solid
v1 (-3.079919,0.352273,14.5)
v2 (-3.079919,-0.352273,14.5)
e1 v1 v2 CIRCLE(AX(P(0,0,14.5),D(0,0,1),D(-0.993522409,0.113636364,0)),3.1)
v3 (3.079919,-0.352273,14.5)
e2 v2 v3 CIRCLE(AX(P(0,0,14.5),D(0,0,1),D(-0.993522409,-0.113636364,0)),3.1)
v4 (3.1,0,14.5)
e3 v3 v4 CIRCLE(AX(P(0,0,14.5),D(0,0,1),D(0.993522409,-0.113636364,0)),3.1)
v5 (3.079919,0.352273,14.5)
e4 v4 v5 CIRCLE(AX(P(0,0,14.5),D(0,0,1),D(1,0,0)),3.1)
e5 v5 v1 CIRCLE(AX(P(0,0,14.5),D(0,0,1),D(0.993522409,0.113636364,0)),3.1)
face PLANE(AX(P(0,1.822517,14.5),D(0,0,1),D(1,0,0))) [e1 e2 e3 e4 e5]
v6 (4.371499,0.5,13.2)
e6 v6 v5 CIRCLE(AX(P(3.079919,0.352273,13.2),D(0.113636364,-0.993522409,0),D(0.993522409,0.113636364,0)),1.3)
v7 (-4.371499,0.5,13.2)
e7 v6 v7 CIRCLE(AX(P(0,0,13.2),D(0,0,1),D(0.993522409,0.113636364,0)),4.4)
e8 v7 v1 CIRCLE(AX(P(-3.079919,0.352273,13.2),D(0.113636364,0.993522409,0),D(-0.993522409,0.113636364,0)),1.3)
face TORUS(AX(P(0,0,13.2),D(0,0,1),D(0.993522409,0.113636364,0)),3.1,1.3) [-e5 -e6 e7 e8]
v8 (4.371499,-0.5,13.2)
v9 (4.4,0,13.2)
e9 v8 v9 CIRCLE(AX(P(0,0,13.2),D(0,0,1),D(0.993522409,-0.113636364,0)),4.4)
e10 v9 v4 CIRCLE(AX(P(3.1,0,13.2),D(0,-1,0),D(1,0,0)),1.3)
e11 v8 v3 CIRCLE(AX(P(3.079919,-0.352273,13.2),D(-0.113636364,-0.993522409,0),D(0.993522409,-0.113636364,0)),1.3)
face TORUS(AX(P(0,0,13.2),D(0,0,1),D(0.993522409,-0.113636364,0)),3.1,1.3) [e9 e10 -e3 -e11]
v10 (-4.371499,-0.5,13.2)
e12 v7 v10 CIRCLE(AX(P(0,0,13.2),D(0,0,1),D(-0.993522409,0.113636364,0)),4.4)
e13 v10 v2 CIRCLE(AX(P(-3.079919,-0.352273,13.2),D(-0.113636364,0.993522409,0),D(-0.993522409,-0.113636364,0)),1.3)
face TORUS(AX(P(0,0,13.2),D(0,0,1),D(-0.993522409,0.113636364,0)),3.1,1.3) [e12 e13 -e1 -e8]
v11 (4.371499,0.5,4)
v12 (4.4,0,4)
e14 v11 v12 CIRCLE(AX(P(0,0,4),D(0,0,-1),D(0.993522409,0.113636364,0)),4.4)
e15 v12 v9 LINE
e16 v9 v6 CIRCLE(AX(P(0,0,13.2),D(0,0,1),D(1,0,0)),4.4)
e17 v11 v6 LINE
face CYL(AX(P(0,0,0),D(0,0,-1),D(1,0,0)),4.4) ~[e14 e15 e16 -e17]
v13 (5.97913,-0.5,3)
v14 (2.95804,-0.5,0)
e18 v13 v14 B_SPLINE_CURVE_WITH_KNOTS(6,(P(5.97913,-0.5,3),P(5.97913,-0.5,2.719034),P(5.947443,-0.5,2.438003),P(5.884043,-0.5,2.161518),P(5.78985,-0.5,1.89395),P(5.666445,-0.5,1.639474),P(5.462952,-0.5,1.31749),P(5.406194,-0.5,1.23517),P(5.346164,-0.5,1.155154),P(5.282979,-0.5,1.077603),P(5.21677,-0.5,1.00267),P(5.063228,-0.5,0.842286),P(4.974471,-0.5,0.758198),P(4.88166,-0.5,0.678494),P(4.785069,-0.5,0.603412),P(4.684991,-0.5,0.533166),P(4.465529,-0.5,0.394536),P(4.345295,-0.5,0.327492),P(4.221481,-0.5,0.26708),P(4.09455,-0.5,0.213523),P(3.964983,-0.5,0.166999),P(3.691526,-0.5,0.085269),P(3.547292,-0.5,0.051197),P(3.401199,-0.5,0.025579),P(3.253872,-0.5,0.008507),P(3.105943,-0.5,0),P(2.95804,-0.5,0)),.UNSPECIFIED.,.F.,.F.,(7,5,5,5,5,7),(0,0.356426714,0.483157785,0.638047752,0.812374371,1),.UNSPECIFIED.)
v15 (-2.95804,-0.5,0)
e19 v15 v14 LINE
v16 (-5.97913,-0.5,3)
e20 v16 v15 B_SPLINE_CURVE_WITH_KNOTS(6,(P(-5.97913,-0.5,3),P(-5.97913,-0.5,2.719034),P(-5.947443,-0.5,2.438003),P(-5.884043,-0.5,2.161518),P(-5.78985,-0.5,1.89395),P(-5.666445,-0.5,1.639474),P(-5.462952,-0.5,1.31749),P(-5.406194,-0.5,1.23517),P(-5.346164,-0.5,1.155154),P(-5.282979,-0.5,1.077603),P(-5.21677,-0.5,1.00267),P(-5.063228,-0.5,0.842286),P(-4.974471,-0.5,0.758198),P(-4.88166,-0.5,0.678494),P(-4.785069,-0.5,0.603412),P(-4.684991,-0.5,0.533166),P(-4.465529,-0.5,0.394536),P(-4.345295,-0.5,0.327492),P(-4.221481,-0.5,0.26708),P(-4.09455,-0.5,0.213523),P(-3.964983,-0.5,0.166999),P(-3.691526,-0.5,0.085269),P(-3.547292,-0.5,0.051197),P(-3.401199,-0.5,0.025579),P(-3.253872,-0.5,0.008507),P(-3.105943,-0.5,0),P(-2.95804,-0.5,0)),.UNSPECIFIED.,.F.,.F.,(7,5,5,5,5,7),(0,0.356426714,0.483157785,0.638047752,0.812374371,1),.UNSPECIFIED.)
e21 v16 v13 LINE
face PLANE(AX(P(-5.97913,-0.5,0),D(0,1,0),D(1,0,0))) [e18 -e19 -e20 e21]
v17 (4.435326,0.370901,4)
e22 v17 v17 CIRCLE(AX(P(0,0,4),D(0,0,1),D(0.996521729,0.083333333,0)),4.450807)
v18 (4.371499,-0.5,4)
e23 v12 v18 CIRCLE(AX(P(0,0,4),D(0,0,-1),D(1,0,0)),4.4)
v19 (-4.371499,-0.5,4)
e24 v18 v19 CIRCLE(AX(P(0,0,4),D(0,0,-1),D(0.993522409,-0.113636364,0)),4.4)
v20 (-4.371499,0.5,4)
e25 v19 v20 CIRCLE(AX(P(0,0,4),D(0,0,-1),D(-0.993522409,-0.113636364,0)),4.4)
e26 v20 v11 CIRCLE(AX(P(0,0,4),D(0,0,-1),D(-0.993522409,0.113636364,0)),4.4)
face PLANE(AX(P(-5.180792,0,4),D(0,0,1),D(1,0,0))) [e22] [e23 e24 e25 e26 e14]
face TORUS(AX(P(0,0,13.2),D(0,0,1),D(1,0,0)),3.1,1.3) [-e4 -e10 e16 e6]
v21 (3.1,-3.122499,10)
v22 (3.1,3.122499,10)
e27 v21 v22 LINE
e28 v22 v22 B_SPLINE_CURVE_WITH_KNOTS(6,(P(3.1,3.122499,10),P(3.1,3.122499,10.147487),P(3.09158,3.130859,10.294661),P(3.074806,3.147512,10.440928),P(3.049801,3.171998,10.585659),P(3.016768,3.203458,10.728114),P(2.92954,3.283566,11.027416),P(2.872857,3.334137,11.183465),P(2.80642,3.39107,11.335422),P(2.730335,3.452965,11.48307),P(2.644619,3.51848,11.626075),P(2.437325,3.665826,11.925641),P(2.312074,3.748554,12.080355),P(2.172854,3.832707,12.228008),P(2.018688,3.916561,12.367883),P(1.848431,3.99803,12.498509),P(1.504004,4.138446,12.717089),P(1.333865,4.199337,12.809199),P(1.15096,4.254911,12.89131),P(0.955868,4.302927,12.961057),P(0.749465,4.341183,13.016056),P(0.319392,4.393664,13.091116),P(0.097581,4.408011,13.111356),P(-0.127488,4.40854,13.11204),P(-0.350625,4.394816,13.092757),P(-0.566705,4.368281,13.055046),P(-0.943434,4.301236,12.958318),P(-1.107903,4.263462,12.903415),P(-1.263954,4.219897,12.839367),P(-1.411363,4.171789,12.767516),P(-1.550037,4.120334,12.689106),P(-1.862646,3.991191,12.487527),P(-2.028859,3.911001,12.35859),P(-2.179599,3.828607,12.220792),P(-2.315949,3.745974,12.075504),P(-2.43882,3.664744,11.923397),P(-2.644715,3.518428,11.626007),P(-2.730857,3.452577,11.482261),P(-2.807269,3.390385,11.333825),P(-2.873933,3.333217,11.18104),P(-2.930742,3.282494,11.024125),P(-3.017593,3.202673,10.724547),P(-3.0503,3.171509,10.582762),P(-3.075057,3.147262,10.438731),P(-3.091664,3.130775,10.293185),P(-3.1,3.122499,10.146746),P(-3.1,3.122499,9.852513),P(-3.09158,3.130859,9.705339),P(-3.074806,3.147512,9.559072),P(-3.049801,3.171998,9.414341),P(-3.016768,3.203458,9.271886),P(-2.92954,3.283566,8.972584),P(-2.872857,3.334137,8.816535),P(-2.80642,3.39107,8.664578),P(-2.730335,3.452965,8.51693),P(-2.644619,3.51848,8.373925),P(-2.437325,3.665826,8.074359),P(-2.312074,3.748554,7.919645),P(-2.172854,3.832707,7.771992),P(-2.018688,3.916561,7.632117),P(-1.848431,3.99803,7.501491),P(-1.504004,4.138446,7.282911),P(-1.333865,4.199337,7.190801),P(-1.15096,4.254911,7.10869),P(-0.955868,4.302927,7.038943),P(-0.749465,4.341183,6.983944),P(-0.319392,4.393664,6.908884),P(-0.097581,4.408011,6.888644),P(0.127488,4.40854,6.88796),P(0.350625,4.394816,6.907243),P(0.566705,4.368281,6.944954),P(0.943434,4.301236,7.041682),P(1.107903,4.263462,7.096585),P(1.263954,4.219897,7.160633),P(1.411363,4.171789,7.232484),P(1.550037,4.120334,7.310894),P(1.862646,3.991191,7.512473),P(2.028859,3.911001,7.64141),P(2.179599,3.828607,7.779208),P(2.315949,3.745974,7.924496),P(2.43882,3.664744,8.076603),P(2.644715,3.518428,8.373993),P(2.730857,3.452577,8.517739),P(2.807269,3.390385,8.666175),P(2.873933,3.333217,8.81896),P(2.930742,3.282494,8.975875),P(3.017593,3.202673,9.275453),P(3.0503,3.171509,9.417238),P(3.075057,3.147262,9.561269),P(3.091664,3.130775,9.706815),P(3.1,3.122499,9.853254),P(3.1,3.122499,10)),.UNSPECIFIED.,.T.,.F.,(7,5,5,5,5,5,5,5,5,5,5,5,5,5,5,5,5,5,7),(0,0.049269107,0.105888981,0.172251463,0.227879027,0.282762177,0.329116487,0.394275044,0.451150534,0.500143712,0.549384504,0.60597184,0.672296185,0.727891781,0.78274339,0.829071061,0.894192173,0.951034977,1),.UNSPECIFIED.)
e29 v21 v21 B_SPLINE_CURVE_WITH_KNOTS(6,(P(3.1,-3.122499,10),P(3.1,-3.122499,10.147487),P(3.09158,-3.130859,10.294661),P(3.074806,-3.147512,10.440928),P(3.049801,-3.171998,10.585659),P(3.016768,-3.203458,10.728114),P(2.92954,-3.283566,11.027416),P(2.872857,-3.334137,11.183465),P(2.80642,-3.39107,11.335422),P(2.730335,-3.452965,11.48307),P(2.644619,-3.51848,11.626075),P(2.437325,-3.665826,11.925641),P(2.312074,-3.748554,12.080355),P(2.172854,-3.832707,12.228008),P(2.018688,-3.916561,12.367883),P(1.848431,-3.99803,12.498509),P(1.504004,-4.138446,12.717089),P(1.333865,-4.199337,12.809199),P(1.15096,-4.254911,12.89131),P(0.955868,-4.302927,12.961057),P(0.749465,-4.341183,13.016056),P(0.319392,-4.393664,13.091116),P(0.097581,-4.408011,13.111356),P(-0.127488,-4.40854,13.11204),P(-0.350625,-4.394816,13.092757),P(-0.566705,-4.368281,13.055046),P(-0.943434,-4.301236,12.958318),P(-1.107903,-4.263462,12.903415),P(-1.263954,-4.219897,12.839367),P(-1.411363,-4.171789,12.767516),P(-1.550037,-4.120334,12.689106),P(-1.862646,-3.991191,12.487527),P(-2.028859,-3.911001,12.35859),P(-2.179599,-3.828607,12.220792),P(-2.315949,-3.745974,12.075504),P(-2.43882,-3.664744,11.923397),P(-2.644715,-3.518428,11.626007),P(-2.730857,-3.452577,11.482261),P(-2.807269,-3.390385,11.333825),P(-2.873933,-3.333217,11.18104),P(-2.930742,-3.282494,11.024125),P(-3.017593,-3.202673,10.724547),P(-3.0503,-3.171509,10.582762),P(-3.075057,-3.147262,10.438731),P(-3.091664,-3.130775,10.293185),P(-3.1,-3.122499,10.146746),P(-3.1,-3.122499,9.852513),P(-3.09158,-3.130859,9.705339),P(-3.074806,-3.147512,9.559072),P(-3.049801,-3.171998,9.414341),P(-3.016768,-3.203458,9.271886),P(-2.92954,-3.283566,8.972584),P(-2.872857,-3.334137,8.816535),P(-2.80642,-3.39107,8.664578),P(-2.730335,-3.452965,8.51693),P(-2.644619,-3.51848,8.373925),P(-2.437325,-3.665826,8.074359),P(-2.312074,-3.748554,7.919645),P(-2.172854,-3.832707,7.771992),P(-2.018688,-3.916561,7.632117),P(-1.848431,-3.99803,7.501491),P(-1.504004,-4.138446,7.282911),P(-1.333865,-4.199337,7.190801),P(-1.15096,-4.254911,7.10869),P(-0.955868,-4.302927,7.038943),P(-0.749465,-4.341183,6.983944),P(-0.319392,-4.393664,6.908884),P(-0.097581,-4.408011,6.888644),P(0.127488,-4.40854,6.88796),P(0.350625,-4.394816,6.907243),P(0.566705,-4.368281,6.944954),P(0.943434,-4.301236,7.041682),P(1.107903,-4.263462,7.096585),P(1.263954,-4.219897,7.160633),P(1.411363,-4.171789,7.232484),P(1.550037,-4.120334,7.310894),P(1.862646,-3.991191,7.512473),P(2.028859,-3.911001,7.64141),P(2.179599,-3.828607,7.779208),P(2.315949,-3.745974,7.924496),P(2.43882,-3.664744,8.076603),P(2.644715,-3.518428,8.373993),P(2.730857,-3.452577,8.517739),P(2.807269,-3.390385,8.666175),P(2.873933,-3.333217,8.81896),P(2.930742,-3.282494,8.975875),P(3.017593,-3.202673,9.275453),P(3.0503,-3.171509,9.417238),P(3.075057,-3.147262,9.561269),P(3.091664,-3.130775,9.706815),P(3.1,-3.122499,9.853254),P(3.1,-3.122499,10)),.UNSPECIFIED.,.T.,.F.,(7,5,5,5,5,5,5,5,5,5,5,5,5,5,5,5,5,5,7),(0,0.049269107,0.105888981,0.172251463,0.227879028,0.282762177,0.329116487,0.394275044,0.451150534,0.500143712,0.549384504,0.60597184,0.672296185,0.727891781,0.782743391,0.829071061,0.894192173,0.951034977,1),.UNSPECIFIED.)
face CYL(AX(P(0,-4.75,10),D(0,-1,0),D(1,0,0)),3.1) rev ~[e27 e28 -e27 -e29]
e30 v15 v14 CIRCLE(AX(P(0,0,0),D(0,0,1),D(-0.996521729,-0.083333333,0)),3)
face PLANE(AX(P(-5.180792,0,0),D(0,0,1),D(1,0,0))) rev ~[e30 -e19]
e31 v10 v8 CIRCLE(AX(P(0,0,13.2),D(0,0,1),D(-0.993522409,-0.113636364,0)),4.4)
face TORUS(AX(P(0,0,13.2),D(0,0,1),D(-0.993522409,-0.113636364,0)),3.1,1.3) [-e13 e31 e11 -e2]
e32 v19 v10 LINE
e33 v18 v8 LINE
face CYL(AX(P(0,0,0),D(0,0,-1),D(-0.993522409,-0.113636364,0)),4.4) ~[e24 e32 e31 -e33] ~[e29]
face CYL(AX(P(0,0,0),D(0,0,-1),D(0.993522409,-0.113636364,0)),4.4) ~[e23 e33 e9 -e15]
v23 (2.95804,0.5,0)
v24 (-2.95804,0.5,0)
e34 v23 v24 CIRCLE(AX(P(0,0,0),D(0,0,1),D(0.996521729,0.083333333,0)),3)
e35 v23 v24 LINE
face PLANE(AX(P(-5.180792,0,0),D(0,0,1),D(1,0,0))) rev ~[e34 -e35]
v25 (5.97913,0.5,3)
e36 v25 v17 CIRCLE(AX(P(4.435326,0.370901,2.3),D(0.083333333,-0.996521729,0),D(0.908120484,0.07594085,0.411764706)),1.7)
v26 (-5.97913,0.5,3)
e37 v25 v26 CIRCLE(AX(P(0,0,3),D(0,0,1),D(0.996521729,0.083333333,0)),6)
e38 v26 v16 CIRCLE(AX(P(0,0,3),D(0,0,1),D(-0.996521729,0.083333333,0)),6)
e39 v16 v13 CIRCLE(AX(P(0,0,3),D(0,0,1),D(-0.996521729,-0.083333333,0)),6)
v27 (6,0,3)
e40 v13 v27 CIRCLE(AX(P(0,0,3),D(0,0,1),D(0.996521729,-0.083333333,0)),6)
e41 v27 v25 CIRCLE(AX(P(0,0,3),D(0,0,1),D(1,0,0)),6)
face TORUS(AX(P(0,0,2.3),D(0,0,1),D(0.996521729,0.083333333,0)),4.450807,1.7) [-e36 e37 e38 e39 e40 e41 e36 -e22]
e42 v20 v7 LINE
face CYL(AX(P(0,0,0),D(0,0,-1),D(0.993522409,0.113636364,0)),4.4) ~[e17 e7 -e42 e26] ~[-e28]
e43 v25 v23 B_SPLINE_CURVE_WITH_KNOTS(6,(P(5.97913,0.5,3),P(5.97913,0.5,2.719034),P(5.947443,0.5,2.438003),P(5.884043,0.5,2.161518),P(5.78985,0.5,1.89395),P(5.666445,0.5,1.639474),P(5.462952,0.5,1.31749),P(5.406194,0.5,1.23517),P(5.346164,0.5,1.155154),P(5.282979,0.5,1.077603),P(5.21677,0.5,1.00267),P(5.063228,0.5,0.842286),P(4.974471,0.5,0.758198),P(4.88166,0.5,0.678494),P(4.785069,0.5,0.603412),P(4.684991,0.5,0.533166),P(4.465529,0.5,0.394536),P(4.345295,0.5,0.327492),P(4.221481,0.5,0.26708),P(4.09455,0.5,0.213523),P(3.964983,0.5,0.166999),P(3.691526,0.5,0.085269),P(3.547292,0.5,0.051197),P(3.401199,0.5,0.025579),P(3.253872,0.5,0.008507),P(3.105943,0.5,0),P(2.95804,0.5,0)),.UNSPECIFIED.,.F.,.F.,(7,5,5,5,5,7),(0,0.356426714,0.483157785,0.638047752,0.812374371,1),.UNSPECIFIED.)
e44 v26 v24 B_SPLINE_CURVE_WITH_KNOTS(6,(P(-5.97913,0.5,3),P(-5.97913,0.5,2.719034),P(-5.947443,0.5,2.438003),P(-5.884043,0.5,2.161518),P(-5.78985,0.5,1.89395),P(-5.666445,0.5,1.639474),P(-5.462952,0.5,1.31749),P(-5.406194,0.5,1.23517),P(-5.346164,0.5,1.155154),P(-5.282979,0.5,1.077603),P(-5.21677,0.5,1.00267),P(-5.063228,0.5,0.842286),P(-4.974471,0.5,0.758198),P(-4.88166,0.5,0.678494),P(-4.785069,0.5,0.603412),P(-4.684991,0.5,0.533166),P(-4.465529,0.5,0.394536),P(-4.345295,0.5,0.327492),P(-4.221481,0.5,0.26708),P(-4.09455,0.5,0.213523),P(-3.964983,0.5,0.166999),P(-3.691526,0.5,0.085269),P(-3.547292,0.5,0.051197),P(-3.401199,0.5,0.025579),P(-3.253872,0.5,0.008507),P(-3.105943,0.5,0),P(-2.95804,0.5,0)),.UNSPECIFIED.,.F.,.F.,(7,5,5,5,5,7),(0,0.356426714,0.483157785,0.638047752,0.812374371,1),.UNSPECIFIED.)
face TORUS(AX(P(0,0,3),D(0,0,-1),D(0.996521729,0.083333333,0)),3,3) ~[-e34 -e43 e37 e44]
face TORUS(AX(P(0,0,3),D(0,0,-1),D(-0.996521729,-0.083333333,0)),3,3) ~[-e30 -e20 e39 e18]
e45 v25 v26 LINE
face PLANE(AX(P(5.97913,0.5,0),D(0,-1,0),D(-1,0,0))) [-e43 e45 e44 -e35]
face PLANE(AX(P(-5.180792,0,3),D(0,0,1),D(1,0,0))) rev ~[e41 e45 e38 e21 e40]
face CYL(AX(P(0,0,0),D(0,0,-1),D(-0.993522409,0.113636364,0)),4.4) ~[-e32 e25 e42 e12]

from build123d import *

# Parameters (mm, degrees)
F1_DEPTH = 14.5
F2_DEPTH = 4
F3_DEPTH = 3
F5_R     = 3.1
F6_DEPTH = 10.751
F7_R     = 3
F9_R     = 1.3


# Not quite as in the source:
# - a fillet or chamfer that OpenCascade refuses, or shapes differently, is made with other operations: its cross-section is extruded or revolved along the edge and cut away or added


with BuildPart() as f1:
    # F0 (on Top) → F1 (new body)
    with BuildSketch(Plane.XY):
        with BuildLine():
            Line((-4.3714985989, 0.5), (4.3714985989, 0.5))
            ThreePointArc((4.3714985989, 0.5), (0, 4.4), (-4.3714985989, 0.5))
        make_face()
        with BuildLine():
            ThreePointArc((4.3714985989, -0.5), (4.392868871, -0.2504058355), (4.4, 0))
            ThreePointArc((4.4, 0), (4.392868871, 0.2504058355), (4.3714985989, 0.5))
            Line((4.3714985989, 0.5), (-4.3714985989, 0.5))
            ThreePointArc((-4.3714985989, 0.5), (-4.4, 0), (-4.3714985989, -0.5))
            Line((-4.3714985989, -0.5), (4.3714985989, -0.5))
        make_face()
        with BuildLine():
            ThreePointArc((-4.3714985989, -0.5), (0, -4.4), (4.3714985989, -0.5))
            Line((4.3714985989, -0.5), (-4.3714985989, -0.5))
        make_face()
    extrude(amount=F1_DEPTH)

    # F0 (on Top) → F2 (join)
    with BuildSketch(Plane.XY):
        with BuildLine():
            ThreePointArc((-4.3714985989, -0.5), (-4.4, 0), (-4.3714985989, 0.5))
            Line((-4.3714985989, 0.5), (-5.9791303716, 0.5))
            ThreePointArc((-5.9791303716, 0.5), (-6, 0), (-5.9791303716, -0.5))
            Line((-5.9791303716, -0.5), (-4.3714985989, -0.5))
        make_face()
        with BuildLine():
            Line((5.9791303716, -0.5), (4.3714985989, -0.5))
            ThreePointArc((4.3714985989, -0.5), (0, -4.4), (-4.3714985989, -0.5))
            Line((-4.3714985989, -0.5), (-5.9791303716, -0.5))
            ThreePointArc((-5.9791303716, -0.5), (0, -6), (5.9791303716, -0.5))
        make_face()
        with BuildLine():
            ThreePointArc((4.3714985989, 0.5), (4.392868871, 0.2504058355), (4.4, 0))
            ThreePointArc((4.4, 0), (4.392868871, -0.2504058355), (4.3714985989, -0.5))
            Line((4.3714985989, -0.5), (5.9791303716, -0.5))
            ThreePointArc((5.9791303716, -0.5), (5.9947803225, -0.2502176759), (6, 0))
            ThreePointArc((6, 0), (5.9947803225, 0.2502176759), (5.9791303716, 0.5))
            Line((5.9791303716, 0.5), (4.3714985989, 0.5))
        make_face()
        with BuildLine():
            ThreePointArc((-4.3714985989, 0.5), (0, 4.4), (4.3714985989, 0.5))
            Line((4.3714985989, 0.5), (5.9791303716, 0.5))
            ThreePointArc((5.9791303716, 0.5), (0, 6), (-5.9791303716, 0.5))
            Line((-5.9791303716, 0.5), (-4.3714985989, 0.5))
        make_face()
    extrude(amount=F2_DEPTH)

    # F0 (on Top) → F3 (cut)
    with BuildSketch(Plane.XY):
        with BuildLine():
            ThreePointArc((-4.3714985989, -0.5), (-4.4, 0), (-4.3714985989, 0.5))
            Line((-4.3714985989, 0.5), (-5.9791303716, 0.5))
            ThreePointArc((-5.9791303716, 0.5), (-6, 0), (-5.9791303716, -0.5))
            Line((-5.9791303716, -0.5), (-4.3714985989, -0.5))
        make_face()
        with BuildLine():
            ThreePointArc((4.3714985989, -0.5), (4.392868871, -0.2504058355), (4.4, 0))
            ThreePointArc((4.4, 0), (4.392868871, 0.2504058355), (4.3714985989, 0.5))
            Line((4.3714985989, 0.5), (-4.3714985989, 0.5))
            ThreePointArc((-4.3714985989, 0.5), (-4.4, 0), (-4.3714985989, -0.5))
            Line((-4.3714985989, -0.5), (4.3714985989, -0.5))
        make_face()
        with BuildLine():
            ThreePointArc((4.3714985989, 0.5), (4.392868871, 0.2504058355), (4.4, 0))
            ThreePointArc((4.4, 0), (4.392868871, -0.2504058355), (4.3714985989, -0.5))
            Line((4.3714985989, -0.5), (5.9791303716, -0.5))
            ThreePointArc((5.9791303716, -0.5), (5.9947803225, -0.2502176759), (6, 0))
            ThreePointArc((6, 0), (5.9947803225, 0.2502176759), (5.9791303716, 0.5))
            Line((5.9791303716, 0.5), (4.3714985989, 0.5))
        make_face()
    extrude(amount=F3_DEPTH, mode=Mode.SUBTRACT)

    # F5 (on offset) → F6 (cut, through all)
    with BuildSketch(Plane.XZ.offset(4.75)):
        with Locations((0, 10)):
            Circle(F5_R)
    extrude(amount=-F6_DEPTH, mode=Mode.SUBTRACT)

    # F7
    f7_edges = [f1.edges().sort_by_distance(p)[0] for p in [
        (0, 6, 0),
        (0, -6, 0),
    ]]
    fillet(f7_edges, radius=F7_R)

    # F8: fillet of radius 1.7 on 1 edges, made by hand

    # F8_s1 → F8_t2 (revolve, cut)
    with BuildSketch(Plane(origin=(0, 0, 0), x_dir=(0, 0, 1), z_dir=(0.0833333333, -0.9965217286, 0))):
        with BuildLine():
            ThreePointArc((3, -6), (3.7282856857, -5.3727611072), (4, -4.4508066615))
            Line((4, -4.4508066615), (4.034, -4.4508066615))
            Line((4.034, -4.4508066615), (4.034, -6))
            Line((4.034, -6), (4, -6.034))
            ThreePointArc((4, -6.034), (3.5, -6.034), (3.014, -6.0309838668))
            Line((3.014, -6.0309838668), (3, -6))
        make_face()
    revolve(axis=Axis((0, 0, 4), (0, 0, 1)), mode=Mode.SUBTRACT)

    # F9
    f9_edges = [f1.edges().sort_by_distance(p)[0] for p in [
        (4.371499, 0.5, 14.5),
    ]]
    fillet(f9_edges, radius=F9_R)


solid = f1.part
